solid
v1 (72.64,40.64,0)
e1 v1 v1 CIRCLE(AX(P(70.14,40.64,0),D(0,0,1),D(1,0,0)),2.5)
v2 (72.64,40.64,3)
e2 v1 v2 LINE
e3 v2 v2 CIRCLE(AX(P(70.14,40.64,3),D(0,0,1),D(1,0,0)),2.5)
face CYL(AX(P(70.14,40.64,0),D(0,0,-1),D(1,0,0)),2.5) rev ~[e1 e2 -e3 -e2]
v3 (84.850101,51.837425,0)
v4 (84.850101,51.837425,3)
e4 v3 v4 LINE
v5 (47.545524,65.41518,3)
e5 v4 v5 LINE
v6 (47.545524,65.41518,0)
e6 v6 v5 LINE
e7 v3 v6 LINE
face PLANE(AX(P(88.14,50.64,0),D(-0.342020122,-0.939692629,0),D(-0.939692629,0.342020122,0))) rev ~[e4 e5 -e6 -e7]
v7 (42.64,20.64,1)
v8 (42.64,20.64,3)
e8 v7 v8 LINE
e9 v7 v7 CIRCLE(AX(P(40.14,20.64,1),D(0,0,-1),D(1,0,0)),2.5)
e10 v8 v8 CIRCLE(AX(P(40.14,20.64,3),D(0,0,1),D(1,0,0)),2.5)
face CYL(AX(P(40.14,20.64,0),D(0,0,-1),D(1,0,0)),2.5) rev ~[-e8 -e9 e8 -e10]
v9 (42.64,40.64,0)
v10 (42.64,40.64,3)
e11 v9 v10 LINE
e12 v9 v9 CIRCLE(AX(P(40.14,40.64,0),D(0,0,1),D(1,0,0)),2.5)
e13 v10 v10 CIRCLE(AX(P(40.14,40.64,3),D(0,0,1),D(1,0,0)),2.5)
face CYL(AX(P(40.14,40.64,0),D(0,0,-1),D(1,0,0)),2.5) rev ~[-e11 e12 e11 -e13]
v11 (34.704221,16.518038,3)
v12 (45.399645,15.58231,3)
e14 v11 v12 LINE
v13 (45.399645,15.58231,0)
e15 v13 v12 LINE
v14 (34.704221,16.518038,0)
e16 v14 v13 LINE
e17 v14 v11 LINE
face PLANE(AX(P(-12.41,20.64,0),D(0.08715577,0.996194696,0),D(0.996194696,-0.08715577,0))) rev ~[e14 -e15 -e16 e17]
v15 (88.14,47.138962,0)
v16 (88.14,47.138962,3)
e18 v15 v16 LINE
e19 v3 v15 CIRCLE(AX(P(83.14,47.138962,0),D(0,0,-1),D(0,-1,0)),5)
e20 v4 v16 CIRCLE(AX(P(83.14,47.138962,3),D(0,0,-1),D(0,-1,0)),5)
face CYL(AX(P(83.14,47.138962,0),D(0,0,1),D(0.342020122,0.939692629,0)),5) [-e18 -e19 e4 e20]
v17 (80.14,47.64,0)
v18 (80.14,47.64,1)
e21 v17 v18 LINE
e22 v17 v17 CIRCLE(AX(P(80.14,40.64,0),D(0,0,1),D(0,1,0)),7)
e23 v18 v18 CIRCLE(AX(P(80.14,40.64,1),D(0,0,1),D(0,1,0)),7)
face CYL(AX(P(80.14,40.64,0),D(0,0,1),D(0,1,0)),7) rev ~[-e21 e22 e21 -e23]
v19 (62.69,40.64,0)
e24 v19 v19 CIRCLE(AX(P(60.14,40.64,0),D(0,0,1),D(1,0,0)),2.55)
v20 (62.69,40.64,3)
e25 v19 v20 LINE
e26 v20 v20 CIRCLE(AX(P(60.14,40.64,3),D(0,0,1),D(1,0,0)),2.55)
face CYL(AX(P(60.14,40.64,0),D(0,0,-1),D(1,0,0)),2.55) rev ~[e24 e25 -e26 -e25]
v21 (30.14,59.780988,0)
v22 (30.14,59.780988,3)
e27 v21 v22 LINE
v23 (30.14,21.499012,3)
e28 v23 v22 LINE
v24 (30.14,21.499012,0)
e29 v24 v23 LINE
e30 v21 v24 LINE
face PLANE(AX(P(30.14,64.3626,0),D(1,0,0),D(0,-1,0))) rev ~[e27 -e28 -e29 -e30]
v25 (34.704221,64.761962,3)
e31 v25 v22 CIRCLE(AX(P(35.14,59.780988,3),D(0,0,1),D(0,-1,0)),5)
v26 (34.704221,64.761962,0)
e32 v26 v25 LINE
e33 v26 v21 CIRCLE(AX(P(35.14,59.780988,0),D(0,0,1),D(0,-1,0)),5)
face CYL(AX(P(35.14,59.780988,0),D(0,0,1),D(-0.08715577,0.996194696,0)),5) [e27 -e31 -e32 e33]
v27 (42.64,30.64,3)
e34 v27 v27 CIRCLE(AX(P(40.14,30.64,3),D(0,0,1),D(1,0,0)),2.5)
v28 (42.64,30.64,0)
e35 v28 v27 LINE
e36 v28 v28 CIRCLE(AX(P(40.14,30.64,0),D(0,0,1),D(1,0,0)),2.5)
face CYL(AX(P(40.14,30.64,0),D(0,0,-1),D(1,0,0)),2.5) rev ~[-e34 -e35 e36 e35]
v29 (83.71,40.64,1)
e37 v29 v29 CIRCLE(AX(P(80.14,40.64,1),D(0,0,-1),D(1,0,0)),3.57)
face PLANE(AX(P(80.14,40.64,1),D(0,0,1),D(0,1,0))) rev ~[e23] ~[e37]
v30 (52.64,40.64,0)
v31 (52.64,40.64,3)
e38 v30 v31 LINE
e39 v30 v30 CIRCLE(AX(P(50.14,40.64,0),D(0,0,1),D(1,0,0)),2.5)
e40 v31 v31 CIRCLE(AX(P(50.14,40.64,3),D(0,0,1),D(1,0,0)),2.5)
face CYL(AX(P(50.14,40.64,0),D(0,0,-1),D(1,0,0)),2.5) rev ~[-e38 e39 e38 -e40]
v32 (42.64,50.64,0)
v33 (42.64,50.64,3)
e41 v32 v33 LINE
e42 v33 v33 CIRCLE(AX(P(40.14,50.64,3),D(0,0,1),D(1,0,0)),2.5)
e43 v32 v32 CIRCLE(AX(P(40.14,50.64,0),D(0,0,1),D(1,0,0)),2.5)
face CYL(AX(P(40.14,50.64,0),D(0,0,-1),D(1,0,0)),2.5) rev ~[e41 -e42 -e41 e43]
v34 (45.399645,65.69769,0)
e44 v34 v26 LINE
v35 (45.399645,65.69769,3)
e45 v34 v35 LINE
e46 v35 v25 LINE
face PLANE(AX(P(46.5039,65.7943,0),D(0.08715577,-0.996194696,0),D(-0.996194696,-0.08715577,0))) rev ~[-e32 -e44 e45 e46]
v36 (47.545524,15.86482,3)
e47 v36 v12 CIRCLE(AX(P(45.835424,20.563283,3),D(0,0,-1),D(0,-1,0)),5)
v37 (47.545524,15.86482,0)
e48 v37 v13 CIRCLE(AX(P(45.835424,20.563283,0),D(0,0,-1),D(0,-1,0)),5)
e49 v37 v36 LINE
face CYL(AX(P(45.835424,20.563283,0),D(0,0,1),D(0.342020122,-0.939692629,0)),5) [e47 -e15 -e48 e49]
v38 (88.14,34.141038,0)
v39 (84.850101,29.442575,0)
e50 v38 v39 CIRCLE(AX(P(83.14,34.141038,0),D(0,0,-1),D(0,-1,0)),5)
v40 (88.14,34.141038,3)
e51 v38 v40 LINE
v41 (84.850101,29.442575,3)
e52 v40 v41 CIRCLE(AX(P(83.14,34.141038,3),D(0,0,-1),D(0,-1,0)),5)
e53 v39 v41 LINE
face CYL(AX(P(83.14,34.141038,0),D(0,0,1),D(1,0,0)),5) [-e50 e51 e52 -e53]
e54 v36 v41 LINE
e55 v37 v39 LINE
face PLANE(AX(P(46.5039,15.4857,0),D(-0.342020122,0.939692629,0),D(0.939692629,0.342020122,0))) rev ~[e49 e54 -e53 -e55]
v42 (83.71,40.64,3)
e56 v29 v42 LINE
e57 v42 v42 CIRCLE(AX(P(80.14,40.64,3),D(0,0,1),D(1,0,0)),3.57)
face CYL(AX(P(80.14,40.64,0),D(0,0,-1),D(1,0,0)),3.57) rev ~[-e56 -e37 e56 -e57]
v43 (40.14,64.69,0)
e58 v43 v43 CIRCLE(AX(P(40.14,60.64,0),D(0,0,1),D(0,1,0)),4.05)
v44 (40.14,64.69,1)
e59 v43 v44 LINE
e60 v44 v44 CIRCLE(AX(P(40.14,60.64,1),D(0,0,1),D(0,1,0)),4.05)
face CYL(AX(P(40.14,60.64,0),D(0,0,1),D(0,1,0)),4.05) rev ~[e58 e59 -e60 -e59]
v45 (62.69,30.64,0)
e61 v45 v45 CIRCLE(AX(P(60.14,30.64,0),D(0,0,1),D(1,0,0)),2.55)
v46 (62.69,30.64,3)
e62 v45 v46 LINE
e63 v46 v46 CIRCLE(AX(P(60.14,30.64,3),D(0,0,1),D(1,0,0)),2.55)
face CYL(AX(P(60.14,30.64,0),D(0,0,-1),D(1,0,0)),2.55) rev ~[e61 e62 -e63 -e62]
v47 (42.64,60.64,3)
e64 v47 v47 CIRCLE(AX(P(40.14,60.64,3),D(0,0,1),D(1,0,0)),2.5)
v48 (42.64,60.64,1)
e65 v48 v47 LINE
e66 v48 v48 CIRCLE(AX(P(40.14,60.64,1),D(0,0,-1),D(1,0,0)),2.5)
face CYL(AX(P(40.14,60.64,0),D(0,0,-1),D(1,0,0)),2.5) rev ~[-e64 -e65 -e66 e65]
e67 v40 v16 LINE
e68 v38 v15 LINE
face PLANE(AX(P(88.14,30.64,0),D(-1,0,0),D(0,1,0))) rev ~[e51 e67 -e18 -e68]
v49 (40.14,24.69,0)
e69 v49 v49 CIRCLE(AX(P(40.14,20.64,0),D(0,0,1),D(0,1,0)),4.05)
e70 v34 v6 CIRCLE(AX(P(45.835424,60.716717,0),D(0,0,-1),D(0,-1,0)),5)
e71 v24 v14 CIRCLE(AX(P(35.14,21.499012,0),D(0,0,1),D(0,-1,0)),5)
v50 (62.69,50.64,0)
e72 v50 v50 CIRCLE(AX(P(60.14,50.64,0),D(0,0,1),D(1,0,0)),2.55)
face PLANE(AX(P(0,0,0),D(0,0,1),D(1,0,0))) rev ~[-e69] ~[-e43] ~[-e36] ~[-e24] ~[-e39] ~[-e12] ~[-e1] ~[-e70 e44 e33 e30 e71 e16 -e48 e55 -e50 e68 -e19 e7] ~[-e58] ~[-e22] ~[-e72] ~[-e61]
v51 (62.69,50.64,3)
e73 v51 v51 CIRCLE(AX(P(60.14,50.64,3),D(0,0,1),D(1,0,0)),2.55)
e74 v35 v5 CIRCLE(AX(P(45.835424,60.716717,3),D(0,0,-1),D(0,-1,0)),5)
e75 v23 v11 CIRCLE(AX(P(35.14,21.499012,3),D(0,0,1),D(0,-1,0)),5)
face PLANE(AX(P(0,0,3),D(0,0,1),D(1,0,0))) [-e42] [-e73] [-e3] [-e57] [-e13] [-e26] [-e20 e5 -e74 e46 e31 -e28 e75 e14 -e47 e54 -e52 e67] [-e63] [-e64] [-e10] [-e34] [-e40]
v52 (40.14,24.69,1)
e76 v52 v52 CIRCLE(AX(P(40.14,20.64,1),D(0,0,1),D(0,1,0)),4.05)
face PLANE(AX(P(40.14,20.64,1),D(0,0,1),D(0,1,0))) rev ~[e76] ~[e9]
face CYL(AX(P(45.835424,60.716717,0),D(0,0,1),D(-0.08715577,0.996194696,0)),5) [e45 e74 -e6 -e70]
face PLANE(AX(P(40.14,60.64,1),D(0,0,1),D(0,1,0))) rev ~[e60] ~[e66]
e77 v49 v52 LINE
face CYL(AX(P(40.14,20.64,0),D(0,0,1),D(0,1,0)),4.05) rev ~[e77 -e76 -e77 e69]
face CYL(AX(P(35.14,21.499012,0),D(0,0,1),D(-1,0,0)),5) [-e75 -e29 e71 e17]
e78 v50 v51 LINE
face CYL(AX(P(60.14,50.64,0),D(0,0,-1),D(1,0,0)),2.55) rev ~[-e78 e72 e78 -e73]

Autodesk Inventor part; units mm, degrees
ref_plane "YZ Plane" through (0, 0, 0) normal (1, 0, 0) x (0, 1, 0)
ref_plane "XZ Plane" through (0, 0, 0) normal (0, 1, 0) x (-1, 0, 0)
ref_plane "XY Plane" through (0, 0, 0) normal (0, 0, 1) x (1, 0, 0)
sketch "Sketch1" plane through (0, 0, 0) normal (0, 0, 1) x (1, 0, 0)
  circle A0 centre (80.14, 40.64) radius 3.57 projected
  circle A1 centre (40.14, 40.64) radius 2.5 projected
  circle A2 centre (40.14, 50.64) radius 2.5 projected
  circle A3 centre (40.14, 60.64) radius 2.5 projected
  circle A4 centre (40.14, 30.64) radius 2.5 projected
  circle A5 centre (40.14, 20.64) radius 2.5 projected
  circle A6 centre (7.59, 40.64) radius 12.5 projected
  arc A7 (-4.314, 26.544) -> (-6.506, 28.736) centre (-5.41, 27.64) ccw projected
  line L0 (-6.814, 24.044) -> (-4.314, 26.544) projected
  arc A8 (-9.006, 26.236) -> (-6.814, 24.044) centre (-7.91, 25.14) ccw projected
  line L1 (-6.506, 28.736) -> (-9.006, 26.236) projected
  line L2 (-4.314, 54.736) -> (-6.814, 57.236) projected
  arc A9 (-6.506, 52.544) -> (-4.314, 54.736) centre (-5.41, 53.64) ccw projected
  line L3 (-9.006, 55.044) -> (-6.506, 52.544) projected
  arc A10 (-6.814, 57.236) -> (-9.006, 55.044) centre (-7.91, 56.14) ccw projected
  line L4 (21.994, 57.236) -> (19.494, 54.736) projected
  arc A11 (19.494, 54.736) -> (21.686, 52.544) centre (20.59, 53.64) ccw projected
  line L5 (21.686, 52.544) -> (24.186, 55.044) projected
  arc A12 (24.186, 55.044) -> (21.994, 57.236) centre (23.09, 56.14) ccw projected
  line L6 (24.186, 26.236) -> (21.686, 28.736) projected
  arc A13 (21.686, 28.736) -> (19.494, 26.544) centre (20.59, 27.64) ccw projected
  line L7 (19.494, 26.544) -> (21.994, 24.044) projected
  arc A14 (21.994, 24.044) -> (24.186, 26.236) centre (23.09, 25.14) ccw projected
  circle A15 centre (60.14, 40.64) radius 2.55 projected
  circle A16 centre (60.14, 30.64) radius 2.55 projected
  circle A17 centre (70.14, 40.64) radius 2.5 projected
  circle A18 centre (60.14, 50.64) radius 2.55 projected
  circle A19 centre (50.14, 40.64) radius 2.5 projected
  line L8 (-12.41, 60.64) -> (-12.41, 20.64)
  line L9 (-12.41, 20.64) -> (46.5039, 15.4857)
  line L10 (46.5039, 15.4857) -> (88.14, 30.64)
  line L11 (88.14, 30.64) -> (88.14, 50.64)
  line L12 (88.14, 50.64) -> (46.5039, 65.7943)
  line L13 (46.5039, 65.7943) -> (-12.41, 60.64)
  point P0 (0, 0)
  dimension "d0" = 40
  dimension "d1" = 20
  dimension "d2" = 20
  dimension "d3" = 8
  dimension "d4" = 10
  dimension "d5" = 20
  dimension "d6" = 95
  dimension "d7" = 95
  dimension "d8" = 110
  dimension "d9" = 110
extrude "Extrusion1" add sketch "Sketch1" along normal blind 3
fillet "Fillet1" radius 5 6 edges at (-12.41, 20.64, 1.5) (46.5039, 15.4857, 1.5) (-12.41, 60.64, 1.5) (46.5039, 65.7943, 1.5) (88.14, 50.64, 1.5) (88.14, 30.64, 1.5)
sketch "Sketch2" plane through (0, 0, 0) normal (0, 0, -1) x (-1, 0, 0)
  circle A0 centre (-40.14, 20.64) radius 2.5 projected
  circle A1 centre (-80.14, 40.64) radius 3.57 projected
  circle A2 centre (-40.14, 60.64) radius 2.5 projected
  point P0 (0, 0)
hole "Hole1" at (40.14, 20.64, 0) at (40.14, 60.64, 0) direction (0, 0, 1) diameter 8.1 depth 1
sketch "Sketch3" plane through (0, 0, 0) normal (0, 0, -1) x (-1, 0, 0)
  circle A0 centre (-80.14, 40.64) radius 3.57 projected
  point P0 (0, 0)
hole "Hole2" at (80.14, 40.64, 0) direction (0, 0, 1) diameter 14 depth 1
sketch "Sketch4" plane through (0, 0, 0) normal (0, 0, -1) x (-1, 0, 0)
  circle A0 centre (-80.14, 40.64) radius 7 projected
  circle A1 centre (-40.14, 20.64) radius 4.05 projected
  circle A2 centre (-40.14, 60.64) radius 4.05 projected
  circle A3 centre (-7.59, 40.64) radius 12.5 projected
  circle A4 centre (-60.14, 50.64) radius 2.55 projected
  circle A5 centre (-60.14, 30.64) radius 2.55 projected
  circle A6 centre (-60.14, 40.64) radius 2.55 projected
  circle A7 centre (-50.14, 40.64) radius 2.5 projected
  circle A8 centre (-70.14, 40.64) radius 2.5 projected
  circle A9 centre (-40.14, 30.64) radius 2.5 projected
  circle A10 centre (-40.14, 50.64) radius 2.5 projected
  circle A11 centre (-40.14, 40.64) radius 2.5 projected
  arc A12 (-24.186, 26.236) -> (-21.994, 24.044) centre (-23.09, 25.14) ccw projected
  line L0 (-24.186, 26.236) -> (-21.686, 28.736) projected
  arc A13 (-19.494, 26.544) -> (-21.686, 28.736) centre (-20.59, 27.64) ccw projected
  line L1 (-19.494, 26.544) -> (-21.994, 24.044) projected
  arc A14 (-21.994, 57.236) -> (-24.186, 55.044) centre (-23.09, 56.14) ccw projected
  line L2 (-21.994, 57.236) -> (-19.494, 54.736) projected
  arc A15 (-21.686, 52.544) -> (-19.494, 54.736) centre (-20.59, 53.64) ccw projected
  line L3 (-21.686, 52.544) -> (-24.186, 55.044) projected
  arc A16 (4.314, 54.736) -> (6.506, 52.544) centre (5.41, 53.64) ccw projected
  line L4 (4.314, 54.736) -> (6.814, 57.236) projected
  arc A17 (9.006, 55.044) -> (6.814, 57.236) centre (7.91, 56.14) ccw projected
  line L5 (9.006, 55.044) -> (6.506, 52.544) projected
  line L6 (6.814, 24.044) -> (4.314, 26.544) projected
  arc A18 (6.506, 28.736) -> (4.314, 26.544) centre (5.41, 27.64) ccw projected
  line L7 (6.506, 28.736) -> (9.006, 26.236) projected
  arc A19 (6.814, 24.044) -> (9.006, 26.236) centre (7.91, 25.14) ccw projected
  arc A20 (-88.14, 34.141) -> (-84.8501, 29.4426) centre (-83.14, 34.141) ccw projected
  line L8 (-47.5455, 15.8648) -> (-84.8501, 29.4426) projected
  arc A21 (-47.5455, 15.8648) -> (-45.3997, 15.5823) centre (-45.8354, 20.5633) ccw projected
  line L9 (7.8458, 20.2407) -> (-45.3997, 15.5823) projected
  arc A22 (7.8458, 20.2407) -> (12.41, 25.2217) centre (7.41, 25.2217) ccw projected
  line L10 (12.41, 56.0583) -> (12.41, 25.2217) projected
  arc A23 (12.41, 56.0583) -> (7.8458, 61.0393) centre (7.41, 56.0583) ccw projected
  line L11 (-45.3997, 65.6977) -> (7.8458, 61.0393) projected
  arc A24 (-45.3997, 65.6977) -> (-47.5455, 65.4152) centre (-45.8354, 60.7167) ccw projected
  line L12 (-84.8501, 51.8374) -> (-47.5455, 65.4152) projected
  arc A25 (-84.8501, 51.8374) -> (-88.14, 47.139) centre (-83.14, 47.139) ccw projected
  line L13 (-88.14, 34.141) -> (-88.14, 47.139) projected
  line L14 (-45.3997, 65.6977) -> (7.8458, 61.0393) projected
  line L15 (-30.14, 64.3626) -> (-30.14, 16.9174)
  point P0 (0, 0)
  dimension "d27" = 10
extrude "Extrusion2" cut sketch "Sketch4" against normal through all contours L15 L11 A23 L10 A22 L9
fillet "Fillet2" radius 5 2 edges at (30.14, 16.9174, 1.5) (30.14, 64.3626, 1.5)
equation "\"d7\" = d6"
properties part number "2020 Slider" material "Aluminum 6061"
